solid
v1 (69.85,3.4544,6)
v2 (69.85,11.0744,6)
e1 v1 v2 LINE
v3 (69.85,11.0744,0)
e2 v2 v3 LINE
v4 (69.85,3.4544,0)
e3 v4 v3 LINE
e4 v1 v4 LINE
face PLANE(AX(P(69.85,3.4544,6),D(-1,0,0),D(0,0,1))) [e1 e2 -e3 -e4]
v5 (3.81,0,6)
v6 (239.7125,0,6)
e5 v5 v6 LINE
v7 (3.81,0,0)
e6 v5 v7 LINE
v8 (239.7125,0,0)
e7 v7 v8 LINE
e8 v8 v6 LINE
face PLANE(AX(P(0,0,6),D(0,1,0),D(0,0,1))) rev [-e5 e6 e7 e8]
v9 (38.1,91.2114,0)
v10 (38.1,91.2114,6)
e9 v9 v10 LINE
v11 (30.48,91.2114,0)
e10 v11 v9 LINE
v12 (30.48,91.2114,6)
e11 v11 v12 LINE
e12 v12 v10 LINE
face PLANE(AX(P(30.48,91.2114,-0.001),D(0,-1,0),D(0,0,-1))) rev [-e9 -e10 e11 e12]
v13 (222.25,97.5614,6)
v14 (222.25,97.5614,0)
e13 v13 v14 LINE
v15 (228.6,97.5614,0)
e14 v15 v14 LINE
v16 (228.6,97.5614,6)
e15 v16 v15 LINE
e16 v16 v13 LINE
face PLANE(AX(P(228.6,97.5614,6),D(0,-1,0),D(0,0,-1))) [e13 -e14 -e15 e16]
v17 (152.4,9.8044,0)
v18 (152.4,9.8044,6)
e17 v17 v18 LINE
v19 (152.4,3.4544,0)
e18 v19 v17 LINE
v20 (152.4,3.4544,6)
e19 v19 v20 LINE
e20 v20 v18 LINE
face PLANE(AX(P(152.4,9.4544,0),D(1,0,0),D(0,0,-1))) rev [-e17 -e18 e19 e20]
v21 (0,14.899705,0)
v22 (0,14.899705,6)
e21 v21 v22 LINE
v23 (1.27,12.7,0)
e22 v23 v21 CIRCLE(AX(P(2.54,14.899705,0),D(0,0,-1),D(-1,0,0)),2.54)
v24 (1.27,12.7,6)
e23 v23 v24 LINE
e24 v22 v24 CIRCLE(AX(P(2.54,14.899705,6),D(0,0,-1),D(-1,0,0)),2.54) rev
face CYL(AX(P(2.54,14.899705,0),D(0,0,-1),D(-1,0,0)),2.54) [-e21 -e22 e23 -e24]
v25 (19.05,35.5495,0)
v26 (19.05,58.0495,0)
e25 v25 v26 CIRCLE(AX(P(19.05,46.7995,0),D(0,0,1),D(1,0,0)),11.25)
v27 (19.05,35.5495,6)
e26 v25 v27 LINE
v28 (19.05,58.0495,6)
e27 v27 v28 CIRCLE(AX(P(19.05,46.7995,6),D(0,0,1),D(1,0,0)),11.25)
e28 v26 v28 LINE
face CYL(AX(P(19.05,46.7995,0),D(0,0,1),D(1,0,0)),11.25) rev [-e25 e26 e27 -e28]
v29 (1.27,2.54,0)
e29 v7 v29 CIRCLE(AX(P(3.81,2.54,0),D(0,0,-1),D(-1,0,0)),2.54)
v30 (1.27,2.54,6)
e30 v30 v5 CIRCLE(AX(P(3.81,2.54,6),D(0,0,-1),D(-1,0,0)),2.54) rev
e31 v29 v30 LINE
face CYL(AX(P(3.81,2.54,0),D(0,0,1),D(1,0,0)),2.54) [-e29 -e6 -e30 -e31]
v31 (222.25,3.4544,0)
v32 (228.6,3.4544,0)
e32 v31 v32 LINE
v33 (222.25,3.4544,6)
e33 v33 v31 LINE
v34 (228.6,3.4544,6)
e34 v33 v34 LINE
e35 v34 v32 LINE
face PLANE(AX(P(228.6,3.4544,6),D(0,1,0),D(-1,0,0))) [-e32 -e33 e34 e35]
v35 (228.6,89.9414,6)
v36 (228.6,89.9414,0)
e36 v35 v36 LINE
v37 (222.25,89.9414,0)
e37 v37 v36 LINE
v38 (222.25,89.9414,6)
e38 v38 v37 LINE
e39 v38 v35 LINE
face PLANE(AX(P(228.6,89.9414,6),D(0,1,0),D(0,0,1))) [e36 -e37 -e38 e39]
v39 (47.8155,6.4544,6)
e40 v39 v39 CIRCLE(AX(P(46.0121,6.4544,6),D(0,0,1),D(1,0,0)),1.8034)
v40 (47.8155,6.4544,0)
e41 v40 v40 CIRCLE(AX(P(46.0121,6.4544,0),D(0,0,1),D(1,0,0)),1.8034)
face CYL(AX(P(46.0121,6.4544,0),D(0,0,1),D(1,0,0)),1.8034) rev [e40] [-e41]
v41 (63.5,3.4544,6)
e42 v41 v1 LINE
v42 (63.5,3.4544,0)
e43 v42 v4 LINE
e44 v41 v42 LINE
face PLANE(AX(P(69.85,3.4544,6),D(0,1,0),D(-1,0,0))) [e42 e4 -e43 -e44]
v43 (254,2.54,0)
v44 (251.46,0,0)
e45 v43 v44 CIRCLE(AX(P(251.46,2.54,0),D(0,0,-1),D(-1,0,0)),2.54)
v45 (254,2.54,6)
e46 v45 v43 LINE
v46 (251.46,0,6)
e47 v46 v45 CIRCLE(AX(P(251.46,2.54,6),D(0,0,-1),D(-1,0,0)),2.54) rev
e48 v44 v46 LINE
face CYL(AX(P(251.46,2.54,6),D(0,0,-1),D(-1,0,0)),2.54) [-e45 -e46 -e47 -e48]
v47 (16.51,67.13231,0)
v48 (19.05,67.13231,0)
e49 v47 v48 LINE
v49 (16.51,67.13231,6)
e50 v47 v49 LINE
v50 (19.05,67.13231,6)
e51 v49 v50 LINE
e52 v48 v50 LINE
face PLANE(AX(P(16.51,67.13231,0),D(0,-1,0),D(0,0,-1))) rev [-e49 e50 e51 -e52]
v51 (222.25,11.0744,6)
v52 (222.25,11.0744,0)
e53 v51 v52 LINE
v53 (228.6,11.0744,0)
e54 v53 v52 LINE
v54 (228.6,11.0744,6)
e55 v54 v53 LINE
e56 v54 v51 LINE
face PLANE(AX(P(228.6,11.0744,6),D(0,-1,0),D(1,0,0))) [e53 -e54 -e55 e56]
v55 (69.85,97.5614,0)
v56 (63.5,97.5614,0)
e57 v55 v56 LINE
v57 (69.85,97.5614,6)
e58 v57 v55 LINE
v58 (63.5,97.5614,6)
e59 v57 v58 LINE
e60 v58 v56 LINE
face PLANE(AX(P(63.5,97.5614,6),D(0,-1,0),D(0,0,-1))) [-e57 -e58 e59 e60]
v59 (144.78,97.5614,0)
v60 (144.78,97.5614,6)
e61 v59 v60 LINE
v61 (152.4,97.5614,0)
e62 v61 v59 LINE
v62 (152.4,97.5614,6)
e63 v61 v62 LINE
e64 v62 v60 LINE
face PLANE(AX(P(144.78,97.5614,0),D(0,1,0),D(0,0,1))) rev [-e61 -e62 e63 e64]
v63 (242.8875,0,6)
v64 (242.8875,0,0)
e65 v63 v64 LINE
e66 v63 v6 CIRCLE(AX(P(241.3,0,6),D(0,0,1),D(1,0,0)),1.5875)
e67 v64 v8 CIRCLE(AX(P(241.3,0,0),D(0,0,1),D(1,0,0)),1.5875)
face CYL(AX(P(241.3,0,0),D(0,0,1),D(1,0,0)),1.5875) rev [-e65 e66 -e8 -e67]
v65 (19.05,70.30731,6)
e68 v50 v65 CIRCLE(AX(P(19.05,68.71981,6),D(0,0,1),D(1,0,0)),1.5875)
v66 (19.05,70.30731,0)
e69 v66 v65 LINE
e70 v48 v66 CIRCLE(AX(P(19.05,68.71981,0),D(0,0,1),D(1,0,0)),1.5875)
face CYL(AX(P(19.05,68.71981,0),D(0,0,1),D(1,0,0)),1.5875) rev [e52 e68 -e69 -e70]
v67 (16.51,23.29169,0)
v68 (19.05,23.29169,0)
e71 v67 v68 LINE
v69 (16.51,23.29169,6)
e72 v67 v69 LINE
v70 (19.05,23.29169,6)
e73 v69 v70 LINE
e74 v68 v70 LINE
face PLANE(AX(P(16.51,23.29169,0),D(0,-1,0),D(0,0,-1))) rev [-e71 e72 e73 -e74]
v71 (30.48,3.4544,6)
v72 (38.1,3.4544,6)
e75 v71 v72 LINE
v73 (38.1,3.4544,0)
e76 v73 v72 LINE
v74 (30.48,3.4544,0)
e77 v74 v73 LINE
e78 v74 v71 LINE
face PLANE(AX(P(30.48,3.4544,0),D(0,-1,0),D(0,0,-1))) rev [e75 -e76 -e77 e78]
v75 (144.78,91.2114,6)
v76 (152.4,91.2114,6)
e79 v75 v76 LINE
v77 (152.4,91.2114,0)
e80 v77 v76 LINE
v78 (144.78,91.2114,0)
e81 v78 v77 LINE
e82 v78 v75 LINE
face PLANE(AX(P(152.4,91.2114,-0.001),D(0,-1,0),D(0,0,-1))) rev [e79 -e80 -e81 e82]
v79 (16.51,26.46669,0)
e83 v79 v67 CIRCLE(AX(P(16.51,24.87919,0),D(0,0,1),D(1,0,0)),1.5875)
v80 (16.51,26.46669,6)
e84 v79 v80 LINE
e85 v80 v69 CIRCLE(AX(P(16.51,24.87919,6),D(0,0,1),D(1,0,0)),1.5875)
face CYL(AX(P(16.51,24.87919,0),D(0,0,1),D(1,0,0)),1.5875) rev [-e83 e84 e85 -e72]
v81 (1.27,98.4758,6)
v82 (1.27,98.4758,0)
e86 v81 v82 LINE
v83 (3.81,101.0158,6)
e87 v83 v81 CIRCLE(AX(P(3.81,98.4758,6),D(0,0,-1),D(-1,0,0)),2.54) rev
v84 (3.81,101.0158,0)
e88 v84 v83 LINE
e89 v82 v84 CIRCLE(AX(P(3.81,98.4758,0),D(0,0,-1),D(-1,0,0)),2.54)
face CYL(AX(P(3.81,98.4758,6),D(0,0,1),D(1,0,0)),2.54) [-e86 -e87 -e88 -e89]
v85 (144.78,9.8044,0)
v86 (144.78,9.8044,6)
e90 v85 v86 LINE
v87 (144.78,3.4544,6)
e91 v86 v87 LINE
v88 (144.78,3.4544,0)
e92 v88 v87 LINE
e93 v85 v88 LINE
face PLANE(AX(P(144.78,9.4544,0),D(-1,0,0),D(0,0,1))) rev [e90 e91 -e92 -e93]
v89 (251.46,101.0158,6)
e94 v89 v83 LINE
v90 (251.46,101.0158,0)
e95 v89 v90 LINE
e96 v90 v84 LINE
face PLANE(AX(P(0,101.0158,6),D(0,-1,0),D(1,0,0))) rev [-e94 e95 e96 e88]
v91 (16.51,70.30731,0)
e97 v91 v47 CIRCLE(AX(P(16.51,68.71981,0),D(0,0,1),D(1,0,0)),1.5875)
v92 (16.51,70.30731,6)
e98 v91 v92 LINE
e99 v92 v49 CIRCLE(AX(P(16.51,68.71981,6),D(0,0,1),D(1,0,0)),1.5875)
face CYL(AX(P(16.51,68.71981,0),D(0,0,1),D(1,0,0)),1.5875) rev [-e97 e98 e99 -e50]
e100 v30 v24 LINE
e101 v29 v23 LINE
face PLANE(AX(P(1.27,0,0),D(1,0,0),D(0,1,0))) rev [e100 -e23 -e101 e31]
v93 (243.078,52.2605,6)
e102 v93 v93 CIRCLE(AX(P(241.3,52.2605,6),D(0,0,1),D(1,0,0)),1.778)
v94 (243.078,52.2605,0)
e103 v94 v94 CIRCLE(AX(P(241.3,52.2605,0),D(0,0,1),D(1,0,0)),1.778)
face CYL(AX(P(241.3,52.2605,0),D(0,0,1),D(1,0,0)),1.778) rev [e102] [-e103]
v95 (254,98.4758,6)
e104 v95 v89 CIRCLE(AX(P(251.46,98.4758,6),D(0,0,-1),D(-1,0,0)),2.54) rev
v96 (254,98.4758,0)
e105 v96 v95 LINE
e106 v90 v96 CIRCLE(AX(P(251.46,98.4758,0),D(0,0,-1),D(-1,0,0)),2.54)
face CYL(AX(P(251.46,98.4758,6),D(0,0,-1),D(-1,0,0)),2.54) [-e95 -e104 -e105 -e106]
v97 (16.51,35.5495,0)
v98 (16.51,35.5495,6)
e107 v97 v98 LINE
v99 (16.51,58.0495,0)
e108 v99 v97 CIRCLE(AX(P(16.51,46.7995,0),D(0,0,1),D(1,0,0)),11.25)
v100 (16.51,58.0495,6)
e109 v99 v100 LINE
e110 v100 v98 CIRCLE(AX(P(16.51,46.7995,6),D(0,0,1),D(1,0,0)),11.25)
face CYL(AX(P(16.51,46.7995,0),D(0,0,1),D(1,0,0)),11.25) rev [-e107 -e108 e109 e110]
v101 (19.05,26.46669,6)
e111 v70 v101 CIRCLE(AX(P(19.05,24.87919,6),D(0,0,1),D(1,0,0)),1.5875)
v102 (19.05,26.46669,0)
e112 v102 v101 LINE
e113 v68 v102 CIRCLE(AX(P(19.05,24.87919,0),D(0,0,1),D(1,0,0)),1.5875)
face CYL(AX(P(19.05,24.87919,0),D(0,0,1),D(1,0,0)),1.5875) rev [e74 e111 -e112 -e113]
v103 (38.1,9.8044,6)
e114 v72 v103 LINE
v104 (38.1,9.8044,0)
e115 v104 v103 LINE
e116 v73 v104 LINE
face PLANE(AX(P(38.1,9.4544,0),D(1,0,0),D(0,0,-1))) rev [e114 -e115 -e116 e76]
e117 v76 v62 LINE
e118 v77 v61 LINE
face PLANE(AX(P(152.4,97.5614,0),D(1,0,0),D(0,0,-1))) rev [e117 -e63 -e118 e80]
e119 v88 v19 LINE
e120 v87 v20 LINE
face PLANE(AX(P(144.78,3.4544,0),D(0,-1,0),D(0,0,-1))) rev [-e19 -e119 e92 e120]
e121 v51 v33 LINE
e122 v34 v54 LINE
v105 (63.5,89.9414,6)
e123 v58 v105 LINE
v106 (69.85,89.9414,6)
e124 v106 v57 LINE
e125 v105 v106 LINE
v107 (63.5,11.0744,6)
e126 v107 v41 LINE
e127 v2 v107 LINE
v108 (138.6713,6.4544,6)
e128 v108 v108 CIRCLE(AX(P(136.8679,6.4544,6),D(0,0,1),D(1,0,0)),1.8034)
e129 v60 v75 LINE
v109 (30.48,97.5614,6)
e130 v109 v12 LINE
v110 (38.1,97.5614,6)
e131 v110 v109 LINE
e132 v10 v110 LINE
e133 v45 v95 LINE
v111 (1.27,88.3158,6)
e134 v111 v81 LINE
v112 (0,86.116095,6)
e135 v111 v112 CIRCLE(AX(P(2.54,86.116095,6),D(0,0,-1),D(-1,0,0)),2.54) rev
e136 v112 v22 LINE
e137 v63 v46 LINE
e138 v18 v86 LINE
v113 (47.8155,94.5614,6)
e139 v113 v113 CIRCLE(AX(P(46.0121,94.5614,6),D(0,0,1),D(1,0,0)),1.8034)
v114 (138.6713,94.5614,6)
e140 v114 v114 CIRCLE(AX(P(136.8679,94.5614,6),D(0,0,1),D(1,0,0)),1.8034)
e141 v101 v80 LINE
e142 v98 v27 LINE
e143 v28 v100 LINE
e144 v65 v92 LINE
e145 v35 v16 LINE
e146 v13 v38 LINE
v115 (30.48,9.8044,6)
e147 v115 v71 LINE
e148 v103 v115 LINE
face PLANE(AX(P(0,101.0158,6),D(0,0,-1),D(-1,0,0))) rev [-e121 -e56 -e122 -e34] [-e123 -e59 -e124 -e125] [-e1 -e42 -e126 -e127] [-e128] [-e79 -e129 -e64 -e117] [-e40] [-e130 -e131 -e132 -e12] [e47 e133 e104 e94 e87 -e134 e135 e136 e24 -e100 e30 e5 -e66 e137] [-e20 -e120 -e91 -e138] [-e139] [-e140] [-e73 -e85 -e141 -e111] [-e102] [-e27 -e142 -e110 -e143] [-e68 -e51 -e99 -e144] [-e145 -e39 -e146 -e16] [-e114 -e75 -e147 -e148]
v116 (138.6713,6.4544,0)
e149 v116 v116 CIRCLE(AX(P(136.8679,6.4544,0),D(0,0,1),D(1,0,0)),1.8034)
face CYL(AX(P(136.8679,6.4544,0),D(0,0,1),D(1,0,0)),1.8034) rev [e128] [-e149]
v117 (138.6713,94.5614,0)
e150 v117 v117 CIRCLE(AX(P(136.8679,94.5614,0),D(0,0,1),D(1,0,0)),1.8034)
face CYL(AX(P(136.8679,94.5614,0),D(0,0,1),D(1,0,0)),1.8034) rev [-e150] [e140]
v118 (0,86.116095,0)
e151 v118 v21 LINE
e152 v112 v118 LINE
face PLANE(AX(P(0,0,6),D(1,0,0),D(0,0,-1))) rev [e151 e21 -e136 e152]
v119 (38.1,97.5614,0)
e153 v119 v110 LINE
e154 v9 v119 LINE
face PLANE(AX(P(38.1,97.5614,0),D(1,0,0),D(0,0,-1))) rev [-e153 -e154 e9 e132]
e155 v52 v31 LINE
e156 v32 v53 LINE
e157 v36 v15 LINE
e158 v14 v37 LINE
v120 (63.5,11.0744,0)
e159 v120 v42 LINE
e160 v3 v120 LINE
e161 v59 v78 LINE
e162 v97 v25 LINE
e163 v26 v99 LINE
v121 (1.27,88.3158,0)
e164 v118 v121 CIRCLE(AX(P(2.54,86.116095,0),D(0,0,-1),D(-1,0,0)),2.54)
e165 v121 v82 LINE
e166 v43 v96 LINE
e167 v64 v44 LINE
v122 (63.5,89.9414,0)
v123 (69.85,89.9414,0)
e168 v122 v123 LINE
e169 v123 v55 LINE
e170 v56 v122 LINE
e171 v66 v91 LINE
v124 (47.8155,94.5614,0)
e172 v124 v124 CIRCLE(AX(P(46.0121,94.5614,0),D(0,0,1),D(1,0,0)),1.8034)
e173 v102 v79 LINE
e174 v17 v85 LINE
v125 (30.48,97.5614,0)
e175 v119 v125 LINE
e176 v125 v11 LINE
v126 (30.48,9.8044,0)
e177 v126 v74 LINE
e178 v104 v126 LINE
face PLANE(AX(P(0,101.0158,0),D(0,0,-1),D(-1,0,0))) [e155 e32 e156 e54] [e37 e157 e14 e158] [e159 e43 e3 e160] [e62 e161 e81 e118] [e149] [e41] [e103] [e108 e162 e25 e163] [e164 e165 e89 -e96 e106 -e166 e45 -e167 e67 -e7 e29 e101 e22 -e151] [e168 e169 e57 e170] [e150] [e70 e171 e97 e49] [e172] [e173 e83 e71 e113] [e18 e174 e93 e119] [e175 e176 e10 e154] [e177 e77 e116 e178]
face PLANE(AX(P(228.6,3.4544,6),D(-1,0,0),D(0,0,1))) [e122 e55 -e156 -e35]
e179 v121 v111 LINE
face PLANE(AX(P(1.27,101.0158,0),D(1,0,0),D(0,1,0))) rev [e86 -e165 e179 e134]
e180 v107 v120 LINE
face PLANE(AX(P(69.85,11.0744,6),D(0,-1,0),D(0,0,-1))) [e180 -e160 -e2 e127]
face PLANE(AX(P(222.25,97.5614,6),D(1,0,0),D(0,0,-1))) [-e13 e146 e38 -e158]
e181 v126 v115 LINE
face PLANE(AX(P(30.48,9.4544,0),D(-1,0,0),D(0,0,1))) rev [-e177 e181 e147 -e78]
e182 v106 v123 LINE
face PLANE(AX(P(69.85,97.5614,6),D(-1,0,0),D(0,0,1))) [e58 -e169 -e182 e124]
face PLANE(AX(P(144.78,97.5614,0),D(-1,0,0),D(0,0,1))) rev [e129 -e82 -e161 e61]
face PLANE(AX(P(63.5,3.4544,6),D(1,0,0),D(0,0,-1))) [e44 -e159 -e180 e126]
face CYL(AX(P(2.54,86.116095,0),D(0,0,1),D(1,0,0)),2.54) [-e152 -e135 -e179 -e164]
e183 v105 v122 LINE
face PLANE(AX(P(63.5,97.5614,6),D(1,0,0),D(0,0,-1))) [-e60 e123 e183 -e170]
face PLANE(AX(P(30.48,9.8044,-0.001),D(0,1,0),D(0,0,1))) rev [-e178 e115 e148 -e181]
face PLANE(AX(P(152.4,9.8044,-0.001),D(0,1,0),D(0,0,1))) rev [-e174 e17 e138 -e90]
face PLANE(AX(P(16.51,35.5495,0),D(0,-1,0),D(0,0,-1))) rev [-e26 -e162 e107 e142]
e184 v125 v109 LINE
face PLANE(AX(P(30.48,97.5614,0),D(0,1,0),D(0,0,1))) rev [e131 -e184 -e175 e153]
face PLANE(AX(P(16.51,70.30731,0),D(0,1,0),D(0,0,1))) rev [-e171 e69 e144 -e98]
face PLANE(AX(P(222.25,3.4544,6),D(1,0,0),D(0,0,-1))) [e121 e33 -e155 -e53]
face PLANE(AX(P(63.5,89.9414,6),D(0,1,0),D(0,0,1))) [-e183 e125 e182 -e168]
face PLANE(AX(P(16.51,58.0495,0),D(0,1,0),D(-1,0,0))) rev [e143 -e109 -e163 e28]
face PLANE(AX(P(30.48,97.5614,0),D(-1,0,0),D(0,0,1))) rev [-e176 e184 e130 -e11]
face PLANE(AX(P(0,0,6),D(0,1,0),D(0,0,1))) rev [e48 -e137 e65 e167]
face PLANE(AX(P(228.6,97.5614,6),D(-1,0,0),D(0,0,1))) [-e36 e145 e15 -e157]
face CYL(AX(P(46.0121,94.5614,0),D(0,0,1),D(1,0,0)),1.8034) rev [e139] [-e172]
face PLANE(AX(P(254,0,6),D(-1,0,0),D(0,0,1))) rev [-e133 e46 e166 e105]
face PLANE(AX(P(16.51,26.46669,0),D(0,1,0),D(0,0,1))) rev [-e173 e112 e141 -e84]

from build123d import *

# Parameters (mm, degrees)
SKETCH1_W           = 254
SKETCH1_H           = 101.0158
SKETCH1_W_2         = 6.35
SKETCH1_H_2         = 7.62
BOSS_EXTRUDE1_DEPTH = 6
SKETCH2_R           = 1.778
CUT_EXTRUDE1_DEPTH  = 274.415785663
SKETCH3_W           = 7.62
SKETCH3_H           = 6
CUT_EXTRUDE2_DEPTH  = 274.415785663
CUT_EXTRUDE3_REACH  = 275.416
SKETCH4_W           = 7.62
SKETCH4_H           = 0.35
SKETCH8_W           = 1.27
SKETCH8_H           = 12.7
CUT_EXTRUDE6_DEPTH  = 274.415785663
FILLET1_R           = 2.54
SKETCH6_R           = 1.8034
CUT_EXTRUDE4_DEPTH  = 274.415785663
SKETCH7_R           = 1.5875
CUT_EXTRUDE5_DEPTH  = 274.415785663


with BuildPart() as part:
    # Sketch1 → Boss-Extrude1 (new body)
    with BuildSketch(Plane.XY):
        with Locations((127, 50.5079)):
            Rectangle(SKETCH1_W, SKETCH1_H)
        with Locations((225.425, 93.7514)):
            Rectangle(SKETCH1_W_2, SKETCH1_H_2, mode=Mode.SUBTRACT)
        with Locations((66.675, 93.7514)):
            Rectangle(SKETCH1_W_2, SKETCH1_H_2, mode=Mode.SUBTRACT)
        with Locations((225.425, 7.2644)):
            Rectangle(SKETCH1_W_2, SKETCH1_H_2, mode=Mode.SUBTRACT)
        with Locations((66.675, 7.2644)):
            Rectangle(SKETCH1_W_2, SKETCH1_H_2, mode=Mode.SUBTRACT)
    extrude(amount=BOSS_EXTRUDE1_DEPTH)

    # Sketch2 → Cut-Extrude1 (cut, through all)
    with BuildSketch(Plane.XY.offset(6)):
        with Locations((241.3, 52.2605)):
            Circle(SKETCH2_R)
        with BuildLine():
            Line((16.51, 70.307310217), (19.05, 70.307310217))
            ThreePointArc((19.05, 70.307310217), (20.6375, 68.719810217), (19.05, 67.132310217))
            Line((19.05, 67.132310217), (16.51, 67.132310217))
            ThreePointArc((16.51, 67.132310217), (14.9225, 68.719810217), (16.51, 70.307310217))
        make_face()
        with BuildLine():
            Line((16.51, 26.466689783), (19.05, 26.466689783))
            ThreePointArc((19.05, 26.466689783), (20.6375, 24.879189783), (19.05, 23.291689783))
            Line((19.05, 23.291689783), (16.51, 23.291689783))
            ThreePointArc((16.51, 23.291689783), (14.9225, 24.879189783), (16.51, 26.466689783))
        make_face()
        with BuildLine():
            Line((16.51, 58.0495), (19.05, 58.0495))
            ThreePointArc((19.05, 58.0495), (30.3, 46.7995), (19.05, 35.5495))
            Line((19.05, 35.5495), (16.51, 35.5495))
            ThreePointArc((16.51, 35.5495), (5.26, 46.7995), (16.51, 58.0495))
        make_face()
    extrude(amount=-CUT_EXTRUDE1_DEPTH, mode=Mode.SUBTRACT)

    # Sketch3 → Cut-Extrude2 (cut, through all)
    with BuildSketch(Plane.XY.offset(6)):
        with Locations((34.29, 94.5614)):
            Rectangle(SKETCH3_W, SKETCH3_H)
        with Locations((148.59, 94.5614)):
            Rectangle(SKETCH3_W, SKETCH3_H)
        with Locations((148.59, 6.4544)):
            Rectangle(SKETCH3_W, SKETCH3_H)
        with Locations((34.29, 6.4544)):
            Rectangle(SKETCH3_W, SKETCH3_H)
    extrude(amount=-CUT_EXTRUDE2_DEPTH, mode=Mode.SUBTRACT)

    # Sketch4 → Cut-Extrude3 (cut, up to next)
    with BuildSketch(Plane.XY.offset(6), mode=Mode.PRIVATE) as cut_extrude3_sk1:
        with Locations((34.29, 91.3864)):
            Rectangle(SKETCH4_W, SKETCH4_H)
    cut_extrude3_tool1 = extrude(cut_extrude3_sk1.sketch, amount=-CUT_EXTRUDE3_REACH, mode=Mode.PRIVATE) & part.part
    # Sketch4 → Cut-Extrude3 (cut, up to next)
    with BuildSketch(Plane.XY.offset(6), mode=Mode.PRIVATE) as cut_extrude3_sk2:
        with Locations((34.29, 9.6294)):
            Rectangle(SKETCH4_W, SKETCH4_H)
    cut_extrude3_tool2 = extrude(cut_extrude3_sk2.sketch, amount=-CUT_EXTRUDE3_REACH, mode=Mode.PRIVATE) & part.part
    # Sketch4 → Cut-Extrude3 (cut, up to next)
    with BuildSketch(Plane.XY.offset(6), mode=Mode.PRIVATE) as cut_extrude3_sk3:
        with Locations((148.59, 91.3864)):
            Rectangle(SKETCH4_W, SKETCH4_H)
    cut_extrude3_tool3 = extrude(cut_extrude3_sk3.sketch, amount=-CUT_EXTRUDE3_REACH, mode=Mode.PRIVATE) & part.part
    # Sketch4 → Cut-Extrude3 (cut, up to next)
    with BuildSketch(Plane.XY.offset(6), mode=Mode.PRIVATE) as cut_extrude3_sk4:
        with Locations((148.59, 9.6294)):
            Rectangle(SKETCH4_W, SKETCH4_H)
    cut_extrude3_tool4 = extrude(cut_extrude3_sk4.sketch, amount=-CUT_EXTRUDE3_REACH, mode=Mode.PRIVATE) & part.part
    add(cut_extrude3_tool1.solids().sort_by_distance((34.29, 91.3864, 6))[0], mode=Mode.SUBTRACT)
    add(cut_extrude3_tool2.solids().sort_by_distance((34.29, 9.6294, 6))[0], mode=Mode.SUBTRACT)
    add(cut_extrude3_tool3.solids().sort_by_distance((148.59, 91.3864, 6))[0], mode=Mode.SUBTRACT)
    add(cut_extrude3_tool4.solids().sort_by_distance((148.59, 9.6294, 6))[0], mode=Mode.SUBTRACT)

    # Sketch8 → Cut-Extrude6 (cut, through all)
    with BuildSketch(Plane.XY.offset(6)):
        with Locations((0.635, 94.6658)):
            Rectangle(SKETCH8_W, SKETCH8_H)
        with Locations((0.635, 6.35)):
            Rectangle(SKETCH8_W, SKETCH8_H)
    extrude(amount=-CUT_EXTRUDE6_DEPTH, mode=Mode.SUBTRACT)

    # Fillet1
    # the kernel refuses this fillet: 2.54 mm, written as the material it takes off along each edge
    with BuildSketch(Plane(origin=(254, 0, -6.35), x_dir=(-1, 0, 0), z_dir=(0, 0, 1)), Plane(origin=(254, 101.0158, -6.35), x_dir=(0, -1, 0), z_dir=(0, 0, 1)), Plane(origin=(1.27, 0, 12.35), x_dir=(1, 0, 0), z_dir=(0, 0, -1)), Plane(origin=(1.27, 101.0158, 12.35), x_dir=(0, -1, 0), z_dir=(0, 0, -1))) as fillet1_piece_1:
        with BuildLine():
            CenterArc((FILLET1_R, -FILLET1_R), FILLET1_R, 90, 90)
            Line((0, -FILLET1_R), (-FILLET1_R * 0.02, -FILLET1_R))
            Line((-FILLET1_R * 0.02, -FILLET1_R), (-FILLET1_R * 0.02, FILLET1_R * 0.02))
            Line((-FILLET1_R * 0.02, FILLET1_R * 0.02), (FILLET1_R, FILLET1_R * 0.02))
            Line((FILLET1_R, FILLET1_R * 0.02), (FILLET1_R, 0))
        make_face()
    extrude(amount=18.7, mode=Mode.SUBTRACT)
    with BuildSketch(Plane(origin=(0, 88.3158, 11.499261314), x_dir=(0, -1, 0), z_dir=(0, 0, -1))) as fillet1_piece_2:
        with BuildLine():
            CenterArc((2.199704526, -2.54), FILLET1_R, 90, 60)
            Line((0, -1.27), (-0.043994091, -1.2446))
            ThreePointArc((-0.043994091, -1.2446), (-0.0508, -0.635), (-0.0508, 0))
            Line((-0.0508, 0), (0, 0.0508))
            Line((0, 0.0508), (2.199704526, 0.0508))
            Line((2.199704526, 0.0508), (2.199704526, 0))
        make_face()
    extrude(amount=16.998522628, mode=Mode.SUBTRACT)
    with BuildSketch(Plane(origin=(0, 12.7, 11.499261314), x_dir=(1, 0, 0), z_dir=(0, 0, -1))) as fillet1_piece_3:
        with BuildLine():
            CenterArc((2.54, -2.199704526), FILLET1_R, 120, 60)
            Line((0, -2.199704526), (-0.0508, -2.199704526))
            Line((-0.0508, -2.199704526), (-0.0508, 0))
            Line((-0.0508, 0), (0, 0.0508))
            ThreePointArc((0, 0.0508), (0.635, 0.0508), (1.2446, 0.043994091))
            Line((1.2446, 0.043994091), (1.27, 0))
        make_face()
    extrude(amount=16.998522628, mode=Mode.SUBTRACT)

    # Sketch6 → Cut-Extrude4 (cut, through all)
    with BuildSketch(Plane.XY.offset(6)):
        with Locations((46.0121, 6.4544)):
            Circle(SKETCH6_R)
        with Locations((136.8679, 6.4544)):
            Circle(SKETCH6_R)
        with Locations((46.0121, 94.5614)):
            Circle(SKETCH6_R)
        with Locations((136.8679, 94.5614)):
            Circle(SKETCH6_R)
    extrude(amount=-CUT_EXTRUDE4_DEPTH, mode=Mode.SUBTRACT)

    # Sketch7 → Cut-Extrude5 (cut, through all)
    with BuildSketch(Plane.XY.offset(6)):
        with Locations((241.3, 0)):
            Circle(SKETCH7_R)
    extrude(amount=-CUT_EXTRUDE5_DEPTH, mode=Mode.SUBTRACT)


solid = part.part
